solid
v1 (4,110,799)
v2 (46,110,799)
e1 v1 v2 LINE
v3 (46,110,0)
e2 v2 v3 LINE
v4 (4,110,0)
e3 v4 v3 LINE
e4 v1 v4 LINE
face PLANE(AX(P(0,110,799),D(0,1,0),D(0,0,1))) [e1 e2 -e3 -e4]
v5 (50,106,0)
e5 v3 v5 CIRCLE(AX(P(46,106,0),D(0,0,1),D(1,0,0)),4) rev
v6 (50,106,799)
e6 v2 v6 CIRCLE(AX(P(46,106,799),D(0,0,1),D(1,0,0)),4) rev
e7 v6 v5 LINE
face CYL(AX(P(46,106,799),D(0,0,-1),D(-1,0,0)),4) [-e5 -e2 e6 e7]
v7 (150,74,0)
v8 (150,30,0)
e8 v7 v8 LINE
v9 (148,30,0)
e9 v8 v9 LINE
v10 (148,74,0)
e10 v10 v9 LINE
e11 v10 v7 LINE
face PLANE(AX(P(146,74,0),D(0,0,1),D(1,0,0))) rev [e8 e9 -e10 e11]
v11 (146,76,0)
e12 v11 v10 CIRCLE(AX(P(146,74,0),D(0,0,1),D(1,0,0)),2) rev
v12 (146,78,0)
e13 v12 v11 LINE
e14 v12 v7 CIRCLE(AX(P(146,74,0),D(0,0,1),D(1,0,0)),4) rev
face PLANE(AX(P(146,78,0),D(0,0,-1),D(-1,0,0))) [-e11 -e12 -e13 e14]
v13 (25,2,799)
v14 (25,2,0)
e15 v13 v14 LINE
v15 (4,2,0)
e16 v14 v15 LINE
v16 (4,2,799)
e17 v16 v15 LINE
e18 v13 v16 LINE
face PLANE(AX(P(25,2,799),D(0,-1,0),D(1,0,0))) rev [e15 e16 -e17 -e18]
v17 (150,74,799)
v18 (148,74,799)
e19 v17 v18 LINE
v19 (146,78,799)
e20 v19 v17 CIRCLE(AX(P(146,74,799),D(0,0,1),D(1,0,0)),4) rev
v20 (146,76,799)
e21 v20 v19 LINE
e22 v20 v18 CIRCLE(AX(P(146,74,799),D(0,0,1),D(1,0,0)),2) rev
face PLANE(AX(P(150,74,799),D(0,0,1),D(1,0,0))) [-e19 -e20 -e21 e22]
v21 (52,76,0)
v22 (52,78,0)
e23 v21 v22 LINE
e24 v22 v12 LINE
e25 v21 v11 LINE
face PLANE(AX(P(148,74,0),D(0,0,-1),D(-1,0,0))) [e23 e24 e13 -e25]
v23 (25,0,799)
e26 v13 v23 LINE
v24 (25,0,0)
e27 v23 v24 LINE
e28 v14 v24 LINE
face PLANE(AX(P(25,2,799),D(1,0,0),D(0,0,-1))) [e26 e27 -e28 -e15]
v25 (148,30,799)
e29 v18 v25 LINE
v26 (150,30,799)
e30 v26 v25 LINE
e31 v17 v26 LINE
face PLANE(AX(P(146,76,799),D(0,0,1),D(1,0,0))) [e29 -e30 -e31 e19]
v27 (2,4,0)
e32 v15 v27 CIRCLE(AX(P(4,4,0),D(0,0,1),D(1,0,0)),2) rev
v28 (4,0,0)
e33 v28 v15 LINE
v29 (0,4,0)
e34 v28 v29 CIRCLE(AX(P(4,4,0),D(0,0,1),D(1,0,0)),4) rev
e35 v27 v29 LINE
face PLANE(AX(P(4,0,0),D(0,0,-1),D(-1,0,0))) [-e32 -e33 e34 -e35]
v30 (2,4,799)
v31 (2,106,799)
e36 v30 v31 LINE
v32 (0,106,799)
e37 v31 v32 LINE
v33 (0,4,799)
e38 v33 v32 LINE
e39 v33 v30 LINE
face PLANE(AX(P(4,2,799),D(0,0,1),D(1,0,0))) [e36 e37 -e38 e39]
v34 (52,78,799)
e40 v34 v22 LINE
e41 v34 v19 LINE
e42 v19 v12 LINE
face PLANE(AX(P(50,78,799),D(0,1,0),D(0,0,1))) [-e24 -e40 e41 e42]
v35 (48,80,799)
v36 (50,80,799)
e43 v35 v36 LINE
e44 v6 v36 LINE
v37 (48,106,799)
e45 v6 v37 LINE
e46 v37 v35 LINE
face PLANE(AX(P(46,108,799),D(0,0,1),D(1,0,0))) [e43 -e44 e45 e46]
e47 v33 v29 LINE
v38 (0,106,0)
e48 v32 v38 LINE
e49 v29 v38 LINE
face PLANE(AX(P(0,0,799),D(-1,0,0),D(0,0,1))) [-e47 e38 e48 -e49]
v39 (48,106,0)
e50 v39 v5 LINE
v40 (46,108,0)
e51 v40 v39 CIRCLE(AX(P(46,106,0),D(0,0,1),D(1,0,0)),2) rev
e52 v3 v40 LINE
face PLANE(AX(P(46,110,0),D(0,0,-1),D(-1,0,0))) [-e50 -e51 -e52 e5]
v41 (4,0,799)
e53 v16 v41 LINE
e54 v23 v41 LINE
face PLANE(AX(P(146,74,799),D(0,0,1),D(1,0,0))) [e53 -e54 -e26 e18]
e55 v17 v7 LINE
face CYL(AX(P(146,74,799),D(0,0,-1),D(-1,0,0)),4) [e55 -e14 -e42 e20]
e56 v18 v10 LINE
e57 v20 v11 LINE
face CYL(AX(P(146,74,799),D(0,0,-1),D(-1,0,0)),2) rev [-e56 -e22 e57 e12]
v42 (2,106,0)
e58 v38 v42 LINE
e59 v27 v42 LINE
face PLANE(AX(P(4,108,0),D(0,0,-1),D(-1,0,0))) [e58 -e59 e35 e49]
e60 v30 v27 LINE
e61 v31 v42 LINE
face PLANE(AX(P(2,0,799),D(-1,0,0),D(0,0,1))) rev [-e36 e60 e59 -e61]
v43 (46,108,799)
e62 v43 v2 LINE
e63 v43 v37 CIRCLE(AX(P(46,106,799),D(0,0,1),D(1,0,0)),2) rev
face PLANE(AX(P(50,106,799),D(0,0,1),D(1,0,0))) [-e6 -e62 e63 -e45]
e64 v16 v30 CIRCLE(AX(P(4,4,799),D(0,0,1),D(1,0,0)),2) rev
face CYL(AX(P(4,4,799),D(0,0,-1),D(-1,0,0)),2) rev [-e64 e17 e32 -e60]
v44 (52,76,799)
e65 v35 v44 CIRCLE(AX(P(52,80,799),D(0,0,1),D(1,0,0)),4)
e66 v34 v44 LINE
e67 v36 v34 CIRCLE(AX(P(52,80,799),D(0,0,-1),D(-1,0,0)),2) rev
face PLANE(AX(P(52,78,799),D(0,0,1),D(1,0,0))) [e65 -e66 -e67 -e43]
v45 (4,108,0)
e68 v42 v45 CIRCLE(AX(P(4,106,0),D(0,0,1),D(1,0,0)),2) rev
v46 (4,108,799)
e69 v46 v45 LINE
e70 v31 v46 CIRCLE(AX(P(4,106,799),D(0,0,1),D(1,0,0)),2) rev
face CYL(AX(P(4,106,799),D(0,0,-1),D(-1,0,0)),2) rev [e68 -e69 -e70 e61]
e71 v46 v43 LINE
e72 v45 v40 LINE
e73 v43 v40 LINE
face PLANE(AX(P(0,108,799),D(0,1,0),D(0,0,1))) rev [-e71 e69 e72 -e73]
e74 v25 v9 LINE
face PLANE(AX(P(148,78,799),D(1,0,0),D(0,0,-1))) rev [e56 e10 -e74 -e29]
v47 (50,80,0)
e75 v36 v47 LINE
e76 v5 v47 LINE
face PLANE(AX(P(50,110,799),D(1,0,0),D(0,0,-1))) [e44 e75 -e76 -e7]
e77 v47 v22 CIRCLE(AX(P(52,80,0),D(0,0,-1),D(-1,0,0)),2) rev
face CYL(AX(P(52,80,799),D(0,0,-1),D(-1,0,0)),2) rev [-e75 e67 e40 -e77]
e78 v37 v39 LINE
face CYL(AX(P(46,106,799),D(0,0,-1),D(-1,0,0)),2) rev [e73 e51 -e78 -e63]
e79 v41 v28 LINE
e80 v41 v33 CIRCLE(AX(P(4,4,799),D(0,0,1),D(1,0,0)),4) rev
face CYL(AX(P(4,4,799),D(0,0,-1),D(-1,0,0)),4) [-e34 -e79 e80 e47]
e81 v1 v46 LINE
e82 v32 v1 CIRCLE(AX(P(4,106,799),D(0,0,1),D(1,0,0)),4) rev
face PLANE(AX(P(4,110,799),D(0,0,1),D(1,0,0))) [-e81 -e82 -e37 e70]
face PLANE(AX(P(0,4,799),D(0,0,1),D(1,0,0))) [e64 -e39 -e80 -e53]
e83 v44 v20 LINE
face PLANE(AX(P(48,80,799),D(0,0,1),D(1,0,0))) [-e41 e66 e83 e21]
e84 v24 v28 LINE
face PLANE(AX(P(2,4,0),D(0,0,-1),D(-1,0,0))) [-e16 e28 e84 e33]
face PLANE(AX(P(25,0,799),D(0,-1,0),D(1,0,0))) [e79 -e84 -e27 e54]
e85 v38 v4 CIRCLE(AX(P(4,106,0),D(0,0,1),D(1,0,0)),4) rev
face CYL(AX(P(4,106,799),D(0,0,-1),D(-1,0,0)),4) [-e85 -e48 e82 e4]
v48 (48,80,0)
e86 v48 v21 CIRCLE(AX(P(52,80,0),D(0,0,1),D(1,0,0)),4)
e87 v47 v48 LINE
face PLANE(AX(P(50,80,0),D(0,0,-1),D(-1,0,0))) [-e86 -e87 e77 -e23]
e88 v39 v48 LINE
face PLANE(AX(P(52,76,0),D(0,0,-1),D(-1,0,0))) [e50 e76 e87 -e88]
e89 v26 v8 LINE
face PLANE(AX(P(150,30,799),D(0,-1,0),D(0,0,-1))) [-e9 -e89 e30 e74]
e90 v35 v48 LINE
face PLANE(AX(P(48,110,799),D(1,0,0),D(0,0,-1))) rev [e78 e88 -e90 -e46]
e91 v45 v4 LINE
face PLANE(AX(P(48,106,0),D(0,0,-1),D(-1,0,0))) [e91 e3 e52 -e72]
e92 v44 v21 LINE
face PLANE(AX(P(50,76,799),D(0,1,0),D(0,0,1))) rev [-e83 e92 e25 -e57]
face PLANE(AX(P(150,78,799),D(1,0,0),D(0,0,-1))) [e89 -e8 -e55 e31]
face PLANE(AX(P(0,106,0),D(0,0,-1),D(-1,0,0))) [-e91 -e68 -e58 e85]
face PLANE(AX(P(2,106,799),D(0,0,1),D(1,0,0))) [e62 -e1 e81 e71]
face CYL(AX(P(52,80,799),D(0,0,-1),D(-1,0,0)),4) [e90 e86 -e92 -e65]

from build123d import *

# Parameters (mm, degrees)
BASE_FLANGE1_DEPTH = 799


# Sheet-metal steps are written as plain solids
with BuildPart() as part:
    # Sketch1 → Base-Flange1 (new body)
    with BuildSketch(Plane.XY):
        with BuildLine():
            Line((25, 0), (4, 0))
            ThreePointArc((4, 0), (1.171572875, 1.171572875), (0, 4))
            Line((0, 4), (0, 106))
            ThreePointArc((0, 106), (1.171572875, 108.828427125), (4, 110))
            Line((4, 110), (46, 110))
            ThreePointArc((46, 110), (48.828427125, 108.828427125), (50, 106))
            Line((50, 106), (50, 80))
            ThreePointArc((50, 80), (50.585786438, 78.585786438), (52, 78))
            Line((52, 78), (146, 78))
            ThreePointArc((146, 78), (148.828427125, 76.828427125), (150, 74))
            Line((150, 74), (150, 30))
            Line((150, 30), (148, 30))
            Line((148, 30), (148, 74))
            ThreePointArc((148, 74), (147.414213562, 75.414213562), (146, 76))
            Line((146, 76), (52, 76))
            ThreePointArc((52, 76), (49.171572875, 77.171572875), (48, 80))
            Line((48, 80), (48, 106))
            ThreePointArc((48, 106), (47.414213562, 107.414213562), (46, 108))
            Line((46, 108), (4, 108))
            ThreePointArc((4, 108), (2.585786438, 107.414213562), (2, 106))
            Line((2, 106), (2, 4))
            ThreePointArc((2, 4), (2.585786438, 2.585786438), (4, 2))
            Line((4, 2), (25, 2))
            Line((25, 2), (25, 0))
        make_face()
    extrude(amount=BASE_FLANGE1_DEPTH)


solid = part.part
